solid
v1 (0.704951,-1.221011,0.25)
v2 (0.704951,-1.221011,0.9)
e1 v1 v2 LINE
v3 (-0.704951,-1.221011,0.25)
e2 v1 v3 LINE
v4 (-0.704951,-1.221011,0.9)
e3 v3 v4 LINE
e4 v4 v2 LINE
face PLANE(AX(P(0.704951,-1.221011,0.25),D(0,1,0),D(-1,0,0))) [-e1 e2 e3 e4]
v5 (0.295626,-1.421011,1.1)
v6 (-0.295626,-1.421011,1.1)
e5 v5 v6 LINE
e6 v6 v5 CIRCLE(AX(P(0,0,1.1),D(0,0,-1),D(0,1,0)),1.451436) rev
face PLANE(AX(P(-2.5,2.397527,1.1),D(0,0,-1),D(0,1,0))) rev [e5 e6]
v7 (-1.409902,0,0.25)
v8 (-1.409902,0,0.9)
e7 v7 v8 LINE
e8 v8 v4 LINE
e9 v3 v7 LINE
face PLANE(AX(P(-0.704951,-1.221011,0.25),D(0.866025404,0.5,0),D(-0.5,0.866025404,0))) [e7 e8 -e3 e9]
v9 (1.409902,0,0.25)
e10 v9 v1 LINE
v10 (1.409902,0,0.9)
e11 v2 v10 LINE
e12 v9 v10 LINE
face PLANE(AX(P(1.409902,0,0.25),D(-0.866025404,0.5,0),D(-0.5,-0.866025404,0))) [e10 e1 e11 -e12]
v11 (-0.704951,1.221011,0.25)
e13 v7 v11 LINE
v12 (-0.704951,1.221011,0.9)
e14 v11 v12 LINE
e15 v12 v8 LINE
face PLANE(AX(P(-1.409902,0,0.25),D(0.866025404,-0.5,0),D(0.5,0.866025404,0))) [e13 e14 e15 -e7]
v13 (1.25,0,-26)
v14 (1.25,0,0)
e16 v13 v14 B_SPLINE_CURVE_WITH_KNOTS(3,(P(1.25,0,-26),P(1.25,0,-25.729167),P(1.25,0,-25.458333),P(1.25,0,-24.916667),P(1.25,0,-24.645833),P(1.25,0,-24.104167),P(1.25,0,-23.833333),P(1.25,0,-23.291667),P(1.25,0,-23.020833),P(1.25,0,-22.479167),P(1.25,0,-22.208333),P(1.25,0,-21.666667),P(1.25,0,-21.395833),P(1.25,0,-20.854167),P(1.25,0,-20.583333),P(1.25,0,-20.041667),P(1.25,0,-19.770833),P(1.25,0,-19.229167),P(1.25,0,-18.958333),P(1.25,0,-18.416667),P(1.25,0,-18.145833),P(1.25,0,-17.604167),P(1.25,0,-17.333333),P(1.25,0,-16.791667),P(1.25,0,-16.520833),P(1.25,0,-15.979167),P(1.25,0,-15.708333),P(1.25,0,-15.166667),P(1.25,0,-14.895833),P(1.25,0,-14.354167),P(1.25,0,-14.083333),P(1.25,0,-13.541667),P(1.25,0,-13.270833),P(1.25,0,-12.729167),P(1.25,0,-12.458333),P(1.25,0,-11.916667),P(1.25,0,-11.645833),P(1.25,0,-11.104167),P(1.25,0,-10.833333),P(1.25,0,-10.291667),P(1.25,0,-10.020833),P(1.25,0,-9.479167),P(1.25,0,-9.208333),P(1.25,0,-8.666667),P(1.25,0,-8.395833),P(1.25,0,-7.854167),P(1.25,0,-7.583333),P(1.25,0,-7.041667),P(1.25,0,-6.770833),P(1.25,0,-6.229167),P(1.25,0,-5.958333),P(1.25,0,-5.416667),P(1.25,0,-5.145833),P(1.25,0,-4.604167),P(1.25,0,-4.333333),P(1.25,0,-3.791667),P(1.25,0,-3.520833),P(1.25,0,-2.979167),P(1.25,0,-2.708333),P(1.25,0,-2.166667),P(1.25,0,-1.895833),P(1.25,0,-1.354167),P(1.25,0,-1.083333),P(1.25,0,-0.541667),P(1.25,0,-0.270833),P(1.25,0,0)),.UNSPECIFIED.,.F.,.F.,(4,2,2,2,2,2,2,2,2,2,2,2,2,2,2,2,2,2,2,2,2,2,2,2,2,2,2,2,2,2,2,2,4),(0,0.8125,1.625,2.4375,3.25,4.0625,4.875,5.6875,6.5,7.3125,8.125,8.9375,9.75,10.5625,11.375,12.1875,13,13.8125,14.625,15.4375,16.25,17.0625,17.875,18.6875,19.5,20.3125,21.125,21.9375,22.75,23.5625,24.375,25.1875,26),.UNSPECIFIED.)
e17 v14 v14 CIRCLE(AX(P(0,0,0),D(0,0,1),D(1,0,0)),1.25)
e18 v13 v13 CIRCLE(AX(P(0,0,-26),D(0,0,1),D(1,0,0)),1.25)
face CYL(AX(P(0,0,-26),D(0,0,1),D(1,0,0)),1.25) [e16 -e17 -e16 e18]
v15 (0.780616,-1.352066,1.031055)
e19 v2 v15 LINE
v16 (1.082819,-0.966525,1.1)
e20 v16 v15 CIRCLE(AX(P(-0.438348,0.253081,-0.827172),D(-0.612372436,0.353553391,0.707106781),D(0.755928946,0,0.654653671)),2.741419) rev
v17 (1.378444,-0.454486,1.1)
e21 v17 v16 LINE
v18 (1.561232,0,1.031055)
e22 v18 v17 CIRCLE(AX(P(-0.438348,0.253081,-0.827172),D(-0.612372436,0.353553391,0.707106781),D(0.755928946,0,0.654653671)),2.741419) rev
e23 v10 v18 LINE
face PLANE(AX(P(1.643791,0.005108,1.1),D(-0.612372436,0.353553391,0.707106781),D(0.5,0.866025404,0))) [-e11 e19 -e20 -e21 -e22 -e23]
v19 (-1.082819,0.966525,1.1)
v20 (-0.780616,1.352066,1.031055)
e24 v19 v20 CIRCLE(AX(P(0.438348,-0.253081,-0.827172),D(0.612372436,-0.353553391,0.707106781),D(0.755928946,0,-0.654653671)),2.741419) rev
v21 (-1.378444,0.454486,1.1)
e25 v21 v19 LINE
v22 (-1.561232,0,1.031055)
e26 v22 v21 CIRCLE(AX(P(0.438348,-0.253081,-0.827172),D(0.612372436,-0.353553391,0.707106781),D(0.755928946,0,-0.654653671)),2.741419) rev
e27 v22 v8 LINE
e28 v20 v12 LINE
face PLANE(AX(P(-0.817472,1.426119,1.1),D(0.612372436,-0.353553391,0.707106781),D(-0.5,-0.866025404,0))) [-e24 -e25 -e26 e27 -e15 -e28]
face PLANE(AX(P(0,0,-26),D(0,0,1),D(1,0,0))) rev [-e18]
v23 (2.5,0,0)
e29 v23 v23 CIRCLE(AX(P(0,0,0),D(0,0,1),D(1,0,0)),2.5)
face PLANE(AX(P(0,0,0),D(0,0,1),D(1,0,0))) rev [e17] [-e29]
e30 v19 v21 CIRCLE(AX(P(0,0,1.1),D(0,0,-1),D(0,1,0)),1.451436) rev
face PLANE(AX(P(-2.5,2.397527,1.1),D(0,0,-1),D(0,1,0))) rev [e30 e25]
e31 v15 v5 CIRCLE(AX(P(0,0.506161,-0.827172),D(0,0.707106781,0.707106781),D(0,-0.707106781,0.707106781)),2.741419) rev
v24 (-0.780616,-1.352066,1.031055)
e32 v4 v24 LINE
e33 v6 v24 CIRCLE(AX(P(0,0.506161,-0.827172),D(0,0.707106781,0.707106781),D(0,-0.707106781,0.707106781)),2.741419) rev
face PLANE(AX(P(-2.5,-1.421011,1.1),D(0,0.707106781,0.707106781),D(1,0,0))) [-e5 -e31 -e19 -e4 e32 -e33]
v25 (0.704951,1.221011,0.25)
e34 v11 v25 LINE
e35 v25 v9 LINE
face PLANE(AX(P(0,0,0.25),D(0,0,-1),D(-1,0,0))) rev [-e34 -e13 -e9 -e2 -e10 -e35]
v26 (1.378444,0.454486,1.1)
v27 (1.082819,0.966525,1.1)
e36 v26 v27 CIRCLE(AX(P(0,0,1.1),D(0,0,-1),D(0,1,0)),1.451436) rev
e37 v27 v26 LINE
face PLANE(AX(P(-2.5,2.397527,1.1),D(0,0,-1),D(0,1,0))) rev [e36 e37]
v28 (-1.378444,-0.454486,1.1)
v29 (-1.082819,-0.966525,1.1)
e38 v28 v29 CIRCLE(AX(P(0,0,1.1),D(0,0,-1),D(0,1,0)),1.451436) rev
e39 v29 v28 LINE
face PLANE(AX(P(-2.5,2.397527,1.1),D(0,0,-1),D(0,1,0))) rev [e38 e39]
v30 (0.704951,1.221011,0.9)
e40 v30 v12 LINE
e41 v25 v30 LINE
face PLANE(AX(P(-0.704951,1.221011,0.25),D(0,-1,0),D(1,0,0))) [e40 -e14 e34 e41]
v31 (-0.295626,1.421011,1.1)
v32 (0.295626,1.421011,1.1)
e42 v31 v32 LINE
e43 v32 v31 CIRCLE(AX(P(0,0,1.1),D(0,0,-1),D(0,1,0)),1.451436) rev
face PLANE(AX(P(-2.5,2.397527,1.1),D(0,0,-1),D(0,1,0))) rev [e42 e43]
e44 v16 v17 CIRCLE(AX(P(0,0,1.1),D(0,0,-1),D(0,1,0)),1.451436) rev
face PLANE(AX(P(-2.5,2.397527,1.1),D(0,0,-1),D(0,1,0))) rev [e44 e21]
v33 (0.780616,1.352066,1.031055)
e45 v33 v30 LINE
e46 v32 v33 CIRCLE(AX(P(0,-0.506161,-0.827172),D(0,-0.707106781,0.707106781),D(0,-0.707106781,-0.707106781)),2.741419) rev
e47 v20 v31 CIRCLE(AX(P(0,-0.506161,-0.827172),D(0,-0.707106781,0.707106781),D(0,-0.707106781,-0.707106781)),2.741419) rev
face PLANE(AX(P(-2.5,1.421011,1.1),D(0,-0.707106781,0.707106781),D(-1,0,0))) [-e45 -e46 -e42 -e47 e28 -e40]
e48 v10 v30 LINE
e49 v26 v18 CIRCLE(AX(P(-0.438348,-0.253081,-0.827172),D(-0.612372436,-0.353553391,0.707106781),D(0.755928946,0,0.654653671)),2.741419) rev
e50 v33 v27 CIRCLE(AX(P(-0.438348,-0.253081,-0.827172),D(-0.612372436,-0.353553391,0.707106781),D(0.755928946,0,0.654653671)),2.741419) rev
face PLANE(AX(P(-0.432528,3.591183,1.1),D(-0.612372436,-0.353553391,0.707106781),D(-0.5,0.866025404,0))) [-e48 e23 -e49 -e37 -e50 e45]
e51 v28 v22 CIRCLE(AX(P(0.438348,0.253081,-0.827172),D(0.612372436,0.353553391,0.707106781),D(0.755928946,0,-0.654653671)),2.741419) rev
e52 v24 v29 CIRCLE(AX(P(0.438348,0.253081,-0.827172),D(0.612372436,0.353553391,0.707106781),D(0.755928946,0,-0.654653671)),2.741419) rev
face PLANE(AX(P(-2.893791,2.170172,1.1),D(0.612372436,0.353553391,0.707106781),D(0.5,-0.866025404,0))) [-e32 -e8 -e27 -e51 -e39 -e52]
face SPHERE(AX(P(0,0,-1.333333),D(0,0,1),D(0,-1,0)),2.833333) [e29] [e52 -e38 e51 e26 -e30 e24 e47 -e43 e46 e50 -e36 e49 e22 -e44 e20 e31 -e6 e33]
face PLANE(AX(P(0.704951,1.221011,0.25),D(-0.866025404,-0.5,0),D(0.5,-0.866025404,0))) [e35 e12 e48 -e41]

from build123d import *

# Parameters (mm, degrees)
SKETCH1_R               = 1.25
BOSS_EXTRUDE1_DEPTH     = 26
CUT_EXTRUDE1_DEPTH      = 1.25
CUT_EXTRUDE2_DEPTH      = 27.239283527
CUT_EXTRUDE2_DEPTH_BACK = 27.239283527
SKETCH6_W               = 1.249656436
SKETCH6_H               = 4.384153796
CHAMFER2_SIZE           = 0.2


with BuildPart() as part:
    # Sketch1 → Boss-Extrude1 (new body)
    with BuildSketch(Plane.XY):
        Circle(SKETCH1_R)
    extrude(amount=-BOSS_EXTRUDE1_DEPTH)

    # Sketch3 → Revolve1 (revolve)
    with BuildSketch(Plane(origin=(0, 0, 0), x_dir=(0, 0, -1), z_dir=(1, 0, 0)), mode=Mode.PRIVATE) as revolve1_sk:
        with BuildLine():
            ThreePointArc((-1.5, 0), (-1.096229956, 1.457737974), (0, 2.5))
            Line((0, 2.5), (0, 0))
            Line((0, 0), (-1.5, 0))
        make_face()
    revolve(revolve1_sk.sketch.rotate(Axis((0, 0, 1.5), (0, 0, -1)), 180), axis=Axis((0, 0, 1.5), (0, 0, -1)))

    # Sketch5 → Cut-Extrude1 (cut)
    with BuildSketch(Plane(origin=(0, 0, 1.5), x_dir=(-1, 0, 0), z_dir=(0, 0, -1))):
        Polygon((-1.409901945, 0), (-0.704950973, -1.221010901), (0.704950973, -1.221010901), (1.409901945, 0), (0.704950973, 1.221010901), (-0.704950973, 1.221010901), align=None)
    extrude(amount=CUT_EXTRUDE1_DEPTH, mode=Mode.SUBTRACT)

    # Sketch6 → Cut-Extrude2 (cut, two sides: drawn at the far end of the back side and taken through both)
    with BuildSketch(Plane(origin=(0, 0, 0), x_dir=(0, 0, -1), z_dir=(1, 0, 0)).offset(-CUT_EXTRUDE2_DEPTH_BACK)):
        with Locations((-1.724828218, 0.205450463)):
            Rectangle(SKETCH6_W, SKETCH6_H)
    extrude(amount=CUT_EXTRUDE2_DEPTH + CUT_EXTRUDE2_DEPTH_BACK, mode=Mode.SUBTRACT)

    # Chamfer2
    # the kernel refuses this chamfer: 0.2 mm, written as the material it takes off along each edge
    with BuildSketch(Plane(origin=(1.21928757, 1.221010901, 1.1), x_dir=(1.0390370186618431e-14, 0.9996219169112966, 0.02749587661058733), z_dir=(-1, 0, 0))) as chamfer2_piece_1_section:
        Polygon((CHAMFER2_SIZE * 0.999621916911, CHAMFER2_SIZE * 0.0274958766106), (-CHAMFER2_SIZE * 0.0274958766106, CHAMFER2_SIZE * 0.999621916911), (0, 0), align=None)
    chamfer2_piece_1 = extrude(amount=2.43857514, mode=Mode.PRIVATE)
    chamfer2_piece_1 = split(chamfer2_piece_1, bisect_by=Plane(origin=(0.501104512, 1.574083329, 1.032865614), z_dir=(-0.8660254037844416, -0.49999999999999495, 0)), keep=Keep.TOP, mode=Mode.PRIVATE)
    chamfer2_piece_1 = split(chamfer2_piece_1, bisect_by=Plane(origin=(-0.501104512, 1.574083329, 1.032865614), z_dir=(0.8660254037844347, -0.500000000000007, 0)), keep=Keep.TOP, mode=Mode.PRIVATE)
    add(chamfer2_piece_1, mode=Mode.SUBTRACT)
    with BuildSketch(Plane(origin=(1.667070244, -0.44542856, 1.1), x_dir=(0.8656979742248833, 0.4998109584556433, 0.027495876610586282), z_dir=(-0.49999999999999495, 0.8660254037844416, 0))) as chamfer2_piece_2_section:
        Polygon((CHAMFER2_SIZE * 0.999621916911, CHAMFER2_SIZE * 0.0274958766106), (-CHAMFER2_SIZE * 0.0274958766106, CHAMFER2_SIZE * 0.999621916911), (0, 0), align=None)
    chamfer2_piece_2 = extrude(amount=2.43857514, mode=Mode.PRIVATE)
    chamfer2_piece_2 = split(chamfer2_piece_2, bisect_by=Plane(origin=(1.613748406, 0.353072427, 1.032865614), z_dir=(-0.8660254037844382, 0.500000000000001, 0)), keep=Keep.TOP, mode=Mode.PRIVATE)
    chamfer2_piece_2 = split(chamfer2_piece_2, bisect_by=Plane(origin=(1.112643894, 1.221010901, 1.032865614), z_dir=(0, -1, 0)), keep=Keep.TOP, mode=Mode.PRIVATE)
    add(chamfer2_piece_2, mode=Mode.SUBTRACT)
    with BuildSketch(Plane(origin=(0.447782674, -1.666439461, 1.1), x_dir=(0.8656979742248797, -0.4998109584556493, 0.02749587661058626), z_dir=(0.500000000000001, 0.8660254037844382, 0))) as chamfer2_piece_3_section:
        Polygon((CHAMFER2_SIZE * 0.999621916911, CHAMFER2_SIZE * 0.0274958766106), (-CHAMFER2_SIZE * 0.0274958766106, CHAMFER2_SIZE * 0.999621916911), (0, 0), align=None)
    chamfer2_piece_3 = extrude(amount=2.43857514, mode=Mode.PRIVATE)
    chamfer2_piece_3 = split(chamfer2_piece_3, bisect_by=Plane(origin=(1.112643894, -1.221010901, 1.032865614), z_dir=(0, 1, 0)), keep=Keep.TOP, mode=Mode.PRIVATE)
    chamfer2_piece_3 = split(chamfer2_piece_3, bisect_by=Plane(origin=(1.613748406, -0.353072427, 1.032865614), z_dir=(-0.8660254037844416, -0.49999999999999495, 0)), keep=Keep.TOP, mode=Mode.PRIVATE)
    add(chamfer2_piece_3, mode=Mode.SUBTRACT)
    with BuildSketch(Plane(origin=(-1.21928757, -1.221010901, 1.1), x_dir=(-3.30602687756041e-15, -0.9996219169112968, 0.027495876610586285), z_dir=(1, 0, 0))) as chamfer2_piece_4_section:
        Polygon((CHAMFER2_SIZE * 0.999621916911, CHAMFER2_SIZE * 0.0274958766106), (-CHAMFER2_SIZE * 0.0274958766106, CHAMFER2_SIZE * 0.999621916911), (0, 0), align=None)
    chamfer2_piece_4 = extrude(amount=2.43857514, mode=Mode.PRIVATE)
    chamfer2_piece_4 = split(chamfer2_piece_4, bisect_by=Plane(origin=(-0.501104512, -1.574083329, 1.032865614), z_dir=(0.8660254037844417, 0.49999999999999484, 0)), keep=Keep.TOP, mode=Mode.PRIVATE)
    chamfer2_piece_4 = split(chamfer2_piece_4, bisect_by=Plane(origin=(0.501104512, -1.574083329, 1.032865614), z_dir=(-0.8660254037844382, 0.500000000000001, 0)), keep=Keep.TOP, mode=Mode.PRIVATE)
    add(chamfer2_piece_4, mode=Mode.SUBTRACT)
    with BuildSketch(Plane(origin=(-1.667070244, 0.44542856, 1.1), x_dir=(-0.8656979742248834, -0.4998109584556432, 0.027495876610586265), z_dir=(0.49999999999999484, -0.8660254037844417, 0))) as chamfer2_piece_5_section:
        Polygon((CHAMFER2_SIZE * 0.999621916911, CHAMFER2_SIZE * 0.0274958766106), (-CHAMFER2_SIZE * 0.0274958766106, CHAMFER2_SIZE * 0.999621916911), (0, 0), align=None)
    chamfer2_piece_5 = extrude(amount=2.43857514, mode=Mode.PRIVATE)
    chamfer2_piece_5 = split(chamfer2_piece_5, bisect_by=Plane(origin=(-1.112643894, -1.221010901, 1.032865614), z_dir=(0, 1, 0)), keep=Keep.TOP, mode=Mode.PRIVATE)
    chamfer2_piece_5 = split(chamfer2_piece_5, bisect_by=Plane(origin=(-1.613748406, -0.353072427, 1.032865614), z_dir=(0.8660254037844347, -0.500000000000007, 0)), keep=Keep.TOP, mode=Mode.PRIVATE)
    add(chamfer2_piece_5, mode=Mode.SUBTRACT)
    with BuildSketch(Plane(origin=(-0.447782674, 1.666439461, 1.1), x_dir=(-0.8656979742248764, 0.4998109584556554, 0.027495876610586265), z_dir=(-0.500000000000007, -0.8660254037844347, 0))) as chamfer2_piece_6_section:
        Polygon((CHAMFER2_SIZE * 0.999621916911, CHAMFER2_SIZE * 0.0274958766106), (-CHAMFER2_SIZE * 0.0274958766106, CHAMFER2_SIZE * 0.999621916911), (0, 0), align=None)
    chamfer2_piece_6 = extrude(amount=2.43857514, mode=Mode.PRIVATE)
    chamfer2_piece_6 = split(chamfer2_piece_6, bisect_by=Plane(origin=(-1.112643894, 1.221010901, 1.032865614), z_dir=(0, -1, 0)), keep=Keep.TOP, mode=Mode.PRIVATE)
    chamfer2_piece_6 = split(chamfer2_piece_6, bisect_by=Plane(origin=(-1.613748406, 0.353072427, 1.032865614), z_dir=(0.8660254037844417, 0.49999999999999484, 0)), keep=Keep.TOP, mode=Mode.PRIVATE)
    add(chamfer2_piece_6, mode=Mode.SUBTRACT)
    with BuildSketch(Plane(origin=(1.667070244, -0.44542856, 1.1), x_dir=(0.8656979742248833, 0.4998109584556433, 0.027495876610586282), z_dir=(-0.49999999999999495, 0.8660254037844416, 0))) as chamfer2_piece_7a_section:
        Polygon((CHAMFER2_SIZE * 0.999621916911, CHAMFER2_SIZE * 0.0274958766106), (-CHAMFER2_SIZE * 0.0274958766106, CHAMFER2_SIZE * 0.999621916911), (0, 0), align=None)
    chamfer2_piece_7a = extrude(amount=2.43857514, mode=Mode.PRIVATE)
    chamfer2_piece_7a = split(chamfer2_piece_7a, bisect_by=Plane(origin=(0.645691333, 1.221010901, 1.035460513), z_dir=(0, 1, 0)), keep=Keep.TOP, mode=Mode.PRIVATE)
    with BuildSketch(Plane(origin=(1.21928757, 1.221010901, 1.1), x_dir=(1.0390370186618431e-14, 0.9996219169112966, 0.02749587661058733), z_dir=(-1, 0, 0))) as chamfer2_piece_7b_section:
        Polygon((CHAMFER2_SIZE * 0.999621916911, CHAMFER2_SIZE * 0.0274958766106), (-CHAMFER2_SIZE * 0.0274958766106, CHAMFER2_SIZE * 0.999621916911), (0, 0), align=None)
    chamfer2_piece_7b = extrude(amount=2.43857514, mode=Mode.PRIVATE)
    chamfer2_piece_7b = split(chamfer2_piece_7b, bisect_by=Plane(origin=(0.734580793, 1.169690548, 1.035460513), z_dir=(0.8660254037844416, 0.49999999999999495, 0)), keep=Keep.TOP, mode=Mode.PRIVATE)
    chamfer2_piece_7 = chamfer2_piece_7a & chamfer2_piece_7b
    add(chamfer2_piece_7, mode=Mode.SUBTRACT)
    with BuildSketch(Plane(origin=(1.21928757, 1.221010901, 1.1), x_dir=(1.0390370186618431e-14, 0.9996219169112966, 0.02749587661058733), z_dir=(-1, 0, 0))) as chamfer2_piece_8a_section:
        Polygon((CHAMFER2_SIZE * 0.999621916911, CHAMFER2_SIZE * 0.0274958766106), (-CHAMFER2_SIZE * 0.0274958766106, CHAMFER2_SIZE * 0.999621916911), (0, 0), align=None)
    chamfer2_piece_8a = extrude(amount=2.43857514, mode=Mode.PRIVATE)
    chamfer2_piece_8a = split(chamfer2_piece_8a, bisect_by=Plane(origin=(-0.734580793, 1.169690548, 1.035460513), z_dir=(-0.8660254037844347, 0.500000000000007, 0)), keep=Keep.TOP, mode=Mode.PRIVATE)
    with BuildSketch(Plane(origin=(-0.447782674, 1.666439461, 1.1), x_dir=(-0.8656979742248764, 0.4998109584556554, 0.027495876610586265), z_dir=(-0.500000000000007, -0.8660254037844347, 0))) as chamfer2_piece_8b_section:
        Polygon((CHAMFER2_SIZE * 0.999621916911, CHAMFER2_SIZE * 0.0274958766106), (-CHAMFER2_SIZE * 0.0274958766106, CHAMFER2_SIZE * 0.999621916911), (0, 0), align=None)
    chamfer2_piece_8b = extrude(amount=2.43857514, mode=Mode.PRIVATE)
    chamfer2_piece_8b = split(chamfer2_piece_8b, bisect_by=Plane(origin=(-0.645691333, 1.221010901, 1.035460513), z_dir=(0, 1, 0)), keep=Keep.TOP, mode=Mode.PRIVATE)
    chamfer2_piece_8 = chamfer2_piece_8a & chamfer2_piece_8b
    add(chamfer2_piece_8, mode=Mode.SUBTRACT)
    with BuildSketch(Plane(origin=(0.447782674, -1.666439461, 1.1), x_dir=(0.8656979742248797, -0.4998109584556493, 0.02749587661058626), z_dir=(0.500000000000001, 0.8660254037844382, 0))) as chamfer2_piece_9a_section:
        Polygon((CHAMFER2_SIZE * 0.999621916911, CHAMFER2_SIZE * 0.0274958766106), (-CHAMFER2_SIZE * 0.0274958766106, CHAMFER2_SIZE * 0.999621916911), (0, 0), align=None)
    chamfer2_piece_9a = extrude(amount=2.43857514, mode=Mode.PRIVATE)
    chamfer2_piece_9a = split(chamfer2_piece_9a, bisect_by=Plane(origin=(1.380272125, 0.051320354, 1.035460513), z_dir=(0.8660254037844416, 0.49999999999999495, 0)), keep=Keep.TOP, mode=Mode.PRIVATE)
    with BuildSketch(Plane(origin=(1.667070244, -0.44542856, 1.1), x_dir=(0.8656979742248833, 0.4998109584556433, 0.027495876610586282), z_dir=(-0.49999999999999495, 0.8660254037844416, 0))) as chamfer2_piece_9b_section:
        Polygon((CHAMFER2_SIZE * 0.999621916911, CHAMFER2_SIZE * 0.0274958766106), (-CHAMFER2_SIZE * 0.0274958766106, CHAMFER2_SIZE * 0.999621916911), (0, 0), align=None)
    chamfer2_piece_9b = extrude(amount=2.43857514, mode=Mode.PRIVATE)
    chamfer2_piece_9b = split(chamfer2_piece_9b, bisect_by=Plane(origin=(1.380272125, -0.051320354, 1.035460513), z_dir=(0.8660254037844382, -0.500000000000001, 0)), keep=Keep.TOP, mode=Mode.PRIVATE)
    chamfer2_piece_9 = chamfer2_piece_9a & chamfer2_piece_9b
    add(chamfer2_piece_9, mode=Mode.SUBTRACT)
    with BuildSketch(Plane(origin=(-1.21928757, -1.221010901, 1.1), x_dir=(-3.30602687756041e-15, -0.9996219169112968, 0.027495876610586285), z_dir=(1, 0, 0))) as chamfer2_piece_10a_section:
        Polygon((CHAMFER2_SIZE * 0.999621916911, CHAMFER2_SIZE * 0.0274958766106), (-CHAMFER2_SIZE * 0.0274958766106, CHAMFER2_SIZE * 0.999621916911), (0, 0), align=None)
    chamfer2_piece_10a = extrude(amount=2.43857514, mode=Mode.PRIVATE)
    chamfer2_piece_10a = split(chamfer2_piece_10a, bisect_by=Plane(origin=(0.734580793, -1.169690548, 1.035460513), z_dir=(0.8660254037844382, -0.500000000000001, 0)), keep=Keep.TOP, mode=Mode.PRIVATE)
    with BuildSketch(Plane(origin=(0.447782674, -1.666439461, 1.1), x_dir=(0.8656979742248797, -0.4998109584556493, 0.02749587661058626), z_dir=(0.500000000000001, 0.8660254037844382, 0))) as chamfer2_piece_10b_section:
        Polygon((CHAMFER2_SIZE * 0.999621916911, CHAMFER2_SIZE * 0.0274958766106), (-CHAMFER2_SIZE * 0.0274958766106, CHAMFER2_SIZE * 0.999621916911), (0, 0), align=None)
    chamfer2_piece_10b = extrude(amount=2.43857514, mode=Mode.PRIVATE)
    chamfer2_piece_10b = split(chamfer2_piece_10b, bisect_by=Plane(origin=(0.645691333, -1.221010901, 1.035460513), z_dir=(0, -1, 0)), keep=Keep.TOP, mode=Mode.PRIVATE)
    chamfer2_piece_10 = chamfer2_piece_10a & chamfer2_piece_10b
    add(chamfer2_piece_10, mode=Mode.SUBTRACT)
    with BuildSketch(Plane(origin=(-1.21928757, -1.221010901, 1.1), x_dir=(-3.30602687756041e-15, -0.9996219169112968, 0.027495876610586285), z_dir=(1, 0, 0))) as chamfer2_piece_11a_section:
        Polygon((CHAMFER2_SIZE * 0.999621916911, CHAMFER2_SIZE * 0.0274958766106), (-CHAMFER2_SIZE * 0.0274958766106, CHAMFER2_SIZE * 0.999621916911), (0, 0), align=None)
    chamfer2_piece_11a = extrude(amount=2.43857514, mode=Mode.PRIVATE)
    chamfer2_piece_11a = split(chamfer2_piece_11a, bisect_by=Plane(origin=(-0.734580793, -1.169690548, 1.035460513), z_dir=(-0.8660254037844417, -0.49999999999999484, 0)), keep=Keep.TOP, mode=Mode.PRIVATE)
    with BuildSketch(Plane(origin=(-1.667070244, 0.44542856, 1.1), x_dir=(-0.8656979742248834, -0.4998109584556432, 0.027495876610586265), z_dir=(0.49999999999999484, -0.8660254037844417, 0))) as chamfer2_piece_11b_section:
        Polygon((CHAMFER2_SIZE * 0.999621916911, CHAMFER2_SIZE * 0.0274958766106), (-CHAMFER2_SIZE * 0.0274958766106, CHAMFER2_SIZE * 0.999621916911), (0, 0), align=None)
    chamfer2_piece_11b = extrude(amount=2.43857514, mode=Mode.PRIVATE)
    chamfer2_piece_11b = split(chamfer2_piece_11b, bisect_by=Plane(origin=(-0.645691333, -1.221010901, 1.035460513), z_dir=(0, -1, 0)), keep=Keep.TOP, mode=Mode.PRIVATE)
    chamfer2_piece_11 = chamfer2_piece_11a & chamfer2_piece_11b
    add(chamfer2_piece_11, mode=Mode.SUBTRACT)
    with BuildSketch(Plane(origin=(-0.447782674, 1.666439461, 1.1), x_dir=(-0.8656979742248764, 0.4998109584556554, 0.027495876610586265), z_dir=(-0.500000000000007, -0.8660254037844347, 0))) as chamfer2_piece_12a_section:
        Polygon((CHAMFER2_SIZE * 0.999621916911, CHAMFER2_SIZE * 0.0274958766106), (-CHAMFER2_SIZE * 0.0274958766106, CHAMFER2_SIZE * 0.999621916911), (0, 0), align=None)
    chamfer2_piece_12a = extrude(amount=2.43857514, mode=Mode.PRIVATE)
    chamfer2_piece_12a = split(chamfer2_piece_12a, bisect_by=Plane(origin=(-1.380272125, -0.051320354, 1.035460513), z_dir=(-0.8660254037844417, -0.49999999999999484, 0)), keep=Keep.TOP, mode=Mode.PRIVATE)
    with BuildSketch(Plane(origin=(-1.667070244, 0.44542856, 1.1), x_dir=(-0.8656979742248834, -0.4998109584556432, 0.027495876610586265), z_dir=(0.49999999999999484, -0.8660254037844417, 0))) as chamfer2_piece_12b_section:
        Polygon((CHAMFER2_SIZE * 0.999621916911, CHAMFER2_SIZE * 0.0274958766106), (-CHAMFER2_SIZE * 0.0274958766106, CHAMFER2_SIZE * 0.999621916911), (0, 0), align=None)
    chamfer2_piece_12b = extrude(amount=2.43857514, mode=Mode.PRIVATE)
    chamfer2_piece_12b = split(chamfer2_piece_12b, bisect_by=Plane(origin=(-1.380272125, 0.051320354, 1.035460513), z_dir=(-0.8660254037844347, 0.500000000000007, 0)), keep=Keep.TOP, mode=Mode.PRIVATE)
    chamfer2_piece_12 = chamfer2_piece_12a & chamfer2_piece_12b
    add(chamfer2_piece_12, mode=Mode.SUBTRACT)


solid = part.part
